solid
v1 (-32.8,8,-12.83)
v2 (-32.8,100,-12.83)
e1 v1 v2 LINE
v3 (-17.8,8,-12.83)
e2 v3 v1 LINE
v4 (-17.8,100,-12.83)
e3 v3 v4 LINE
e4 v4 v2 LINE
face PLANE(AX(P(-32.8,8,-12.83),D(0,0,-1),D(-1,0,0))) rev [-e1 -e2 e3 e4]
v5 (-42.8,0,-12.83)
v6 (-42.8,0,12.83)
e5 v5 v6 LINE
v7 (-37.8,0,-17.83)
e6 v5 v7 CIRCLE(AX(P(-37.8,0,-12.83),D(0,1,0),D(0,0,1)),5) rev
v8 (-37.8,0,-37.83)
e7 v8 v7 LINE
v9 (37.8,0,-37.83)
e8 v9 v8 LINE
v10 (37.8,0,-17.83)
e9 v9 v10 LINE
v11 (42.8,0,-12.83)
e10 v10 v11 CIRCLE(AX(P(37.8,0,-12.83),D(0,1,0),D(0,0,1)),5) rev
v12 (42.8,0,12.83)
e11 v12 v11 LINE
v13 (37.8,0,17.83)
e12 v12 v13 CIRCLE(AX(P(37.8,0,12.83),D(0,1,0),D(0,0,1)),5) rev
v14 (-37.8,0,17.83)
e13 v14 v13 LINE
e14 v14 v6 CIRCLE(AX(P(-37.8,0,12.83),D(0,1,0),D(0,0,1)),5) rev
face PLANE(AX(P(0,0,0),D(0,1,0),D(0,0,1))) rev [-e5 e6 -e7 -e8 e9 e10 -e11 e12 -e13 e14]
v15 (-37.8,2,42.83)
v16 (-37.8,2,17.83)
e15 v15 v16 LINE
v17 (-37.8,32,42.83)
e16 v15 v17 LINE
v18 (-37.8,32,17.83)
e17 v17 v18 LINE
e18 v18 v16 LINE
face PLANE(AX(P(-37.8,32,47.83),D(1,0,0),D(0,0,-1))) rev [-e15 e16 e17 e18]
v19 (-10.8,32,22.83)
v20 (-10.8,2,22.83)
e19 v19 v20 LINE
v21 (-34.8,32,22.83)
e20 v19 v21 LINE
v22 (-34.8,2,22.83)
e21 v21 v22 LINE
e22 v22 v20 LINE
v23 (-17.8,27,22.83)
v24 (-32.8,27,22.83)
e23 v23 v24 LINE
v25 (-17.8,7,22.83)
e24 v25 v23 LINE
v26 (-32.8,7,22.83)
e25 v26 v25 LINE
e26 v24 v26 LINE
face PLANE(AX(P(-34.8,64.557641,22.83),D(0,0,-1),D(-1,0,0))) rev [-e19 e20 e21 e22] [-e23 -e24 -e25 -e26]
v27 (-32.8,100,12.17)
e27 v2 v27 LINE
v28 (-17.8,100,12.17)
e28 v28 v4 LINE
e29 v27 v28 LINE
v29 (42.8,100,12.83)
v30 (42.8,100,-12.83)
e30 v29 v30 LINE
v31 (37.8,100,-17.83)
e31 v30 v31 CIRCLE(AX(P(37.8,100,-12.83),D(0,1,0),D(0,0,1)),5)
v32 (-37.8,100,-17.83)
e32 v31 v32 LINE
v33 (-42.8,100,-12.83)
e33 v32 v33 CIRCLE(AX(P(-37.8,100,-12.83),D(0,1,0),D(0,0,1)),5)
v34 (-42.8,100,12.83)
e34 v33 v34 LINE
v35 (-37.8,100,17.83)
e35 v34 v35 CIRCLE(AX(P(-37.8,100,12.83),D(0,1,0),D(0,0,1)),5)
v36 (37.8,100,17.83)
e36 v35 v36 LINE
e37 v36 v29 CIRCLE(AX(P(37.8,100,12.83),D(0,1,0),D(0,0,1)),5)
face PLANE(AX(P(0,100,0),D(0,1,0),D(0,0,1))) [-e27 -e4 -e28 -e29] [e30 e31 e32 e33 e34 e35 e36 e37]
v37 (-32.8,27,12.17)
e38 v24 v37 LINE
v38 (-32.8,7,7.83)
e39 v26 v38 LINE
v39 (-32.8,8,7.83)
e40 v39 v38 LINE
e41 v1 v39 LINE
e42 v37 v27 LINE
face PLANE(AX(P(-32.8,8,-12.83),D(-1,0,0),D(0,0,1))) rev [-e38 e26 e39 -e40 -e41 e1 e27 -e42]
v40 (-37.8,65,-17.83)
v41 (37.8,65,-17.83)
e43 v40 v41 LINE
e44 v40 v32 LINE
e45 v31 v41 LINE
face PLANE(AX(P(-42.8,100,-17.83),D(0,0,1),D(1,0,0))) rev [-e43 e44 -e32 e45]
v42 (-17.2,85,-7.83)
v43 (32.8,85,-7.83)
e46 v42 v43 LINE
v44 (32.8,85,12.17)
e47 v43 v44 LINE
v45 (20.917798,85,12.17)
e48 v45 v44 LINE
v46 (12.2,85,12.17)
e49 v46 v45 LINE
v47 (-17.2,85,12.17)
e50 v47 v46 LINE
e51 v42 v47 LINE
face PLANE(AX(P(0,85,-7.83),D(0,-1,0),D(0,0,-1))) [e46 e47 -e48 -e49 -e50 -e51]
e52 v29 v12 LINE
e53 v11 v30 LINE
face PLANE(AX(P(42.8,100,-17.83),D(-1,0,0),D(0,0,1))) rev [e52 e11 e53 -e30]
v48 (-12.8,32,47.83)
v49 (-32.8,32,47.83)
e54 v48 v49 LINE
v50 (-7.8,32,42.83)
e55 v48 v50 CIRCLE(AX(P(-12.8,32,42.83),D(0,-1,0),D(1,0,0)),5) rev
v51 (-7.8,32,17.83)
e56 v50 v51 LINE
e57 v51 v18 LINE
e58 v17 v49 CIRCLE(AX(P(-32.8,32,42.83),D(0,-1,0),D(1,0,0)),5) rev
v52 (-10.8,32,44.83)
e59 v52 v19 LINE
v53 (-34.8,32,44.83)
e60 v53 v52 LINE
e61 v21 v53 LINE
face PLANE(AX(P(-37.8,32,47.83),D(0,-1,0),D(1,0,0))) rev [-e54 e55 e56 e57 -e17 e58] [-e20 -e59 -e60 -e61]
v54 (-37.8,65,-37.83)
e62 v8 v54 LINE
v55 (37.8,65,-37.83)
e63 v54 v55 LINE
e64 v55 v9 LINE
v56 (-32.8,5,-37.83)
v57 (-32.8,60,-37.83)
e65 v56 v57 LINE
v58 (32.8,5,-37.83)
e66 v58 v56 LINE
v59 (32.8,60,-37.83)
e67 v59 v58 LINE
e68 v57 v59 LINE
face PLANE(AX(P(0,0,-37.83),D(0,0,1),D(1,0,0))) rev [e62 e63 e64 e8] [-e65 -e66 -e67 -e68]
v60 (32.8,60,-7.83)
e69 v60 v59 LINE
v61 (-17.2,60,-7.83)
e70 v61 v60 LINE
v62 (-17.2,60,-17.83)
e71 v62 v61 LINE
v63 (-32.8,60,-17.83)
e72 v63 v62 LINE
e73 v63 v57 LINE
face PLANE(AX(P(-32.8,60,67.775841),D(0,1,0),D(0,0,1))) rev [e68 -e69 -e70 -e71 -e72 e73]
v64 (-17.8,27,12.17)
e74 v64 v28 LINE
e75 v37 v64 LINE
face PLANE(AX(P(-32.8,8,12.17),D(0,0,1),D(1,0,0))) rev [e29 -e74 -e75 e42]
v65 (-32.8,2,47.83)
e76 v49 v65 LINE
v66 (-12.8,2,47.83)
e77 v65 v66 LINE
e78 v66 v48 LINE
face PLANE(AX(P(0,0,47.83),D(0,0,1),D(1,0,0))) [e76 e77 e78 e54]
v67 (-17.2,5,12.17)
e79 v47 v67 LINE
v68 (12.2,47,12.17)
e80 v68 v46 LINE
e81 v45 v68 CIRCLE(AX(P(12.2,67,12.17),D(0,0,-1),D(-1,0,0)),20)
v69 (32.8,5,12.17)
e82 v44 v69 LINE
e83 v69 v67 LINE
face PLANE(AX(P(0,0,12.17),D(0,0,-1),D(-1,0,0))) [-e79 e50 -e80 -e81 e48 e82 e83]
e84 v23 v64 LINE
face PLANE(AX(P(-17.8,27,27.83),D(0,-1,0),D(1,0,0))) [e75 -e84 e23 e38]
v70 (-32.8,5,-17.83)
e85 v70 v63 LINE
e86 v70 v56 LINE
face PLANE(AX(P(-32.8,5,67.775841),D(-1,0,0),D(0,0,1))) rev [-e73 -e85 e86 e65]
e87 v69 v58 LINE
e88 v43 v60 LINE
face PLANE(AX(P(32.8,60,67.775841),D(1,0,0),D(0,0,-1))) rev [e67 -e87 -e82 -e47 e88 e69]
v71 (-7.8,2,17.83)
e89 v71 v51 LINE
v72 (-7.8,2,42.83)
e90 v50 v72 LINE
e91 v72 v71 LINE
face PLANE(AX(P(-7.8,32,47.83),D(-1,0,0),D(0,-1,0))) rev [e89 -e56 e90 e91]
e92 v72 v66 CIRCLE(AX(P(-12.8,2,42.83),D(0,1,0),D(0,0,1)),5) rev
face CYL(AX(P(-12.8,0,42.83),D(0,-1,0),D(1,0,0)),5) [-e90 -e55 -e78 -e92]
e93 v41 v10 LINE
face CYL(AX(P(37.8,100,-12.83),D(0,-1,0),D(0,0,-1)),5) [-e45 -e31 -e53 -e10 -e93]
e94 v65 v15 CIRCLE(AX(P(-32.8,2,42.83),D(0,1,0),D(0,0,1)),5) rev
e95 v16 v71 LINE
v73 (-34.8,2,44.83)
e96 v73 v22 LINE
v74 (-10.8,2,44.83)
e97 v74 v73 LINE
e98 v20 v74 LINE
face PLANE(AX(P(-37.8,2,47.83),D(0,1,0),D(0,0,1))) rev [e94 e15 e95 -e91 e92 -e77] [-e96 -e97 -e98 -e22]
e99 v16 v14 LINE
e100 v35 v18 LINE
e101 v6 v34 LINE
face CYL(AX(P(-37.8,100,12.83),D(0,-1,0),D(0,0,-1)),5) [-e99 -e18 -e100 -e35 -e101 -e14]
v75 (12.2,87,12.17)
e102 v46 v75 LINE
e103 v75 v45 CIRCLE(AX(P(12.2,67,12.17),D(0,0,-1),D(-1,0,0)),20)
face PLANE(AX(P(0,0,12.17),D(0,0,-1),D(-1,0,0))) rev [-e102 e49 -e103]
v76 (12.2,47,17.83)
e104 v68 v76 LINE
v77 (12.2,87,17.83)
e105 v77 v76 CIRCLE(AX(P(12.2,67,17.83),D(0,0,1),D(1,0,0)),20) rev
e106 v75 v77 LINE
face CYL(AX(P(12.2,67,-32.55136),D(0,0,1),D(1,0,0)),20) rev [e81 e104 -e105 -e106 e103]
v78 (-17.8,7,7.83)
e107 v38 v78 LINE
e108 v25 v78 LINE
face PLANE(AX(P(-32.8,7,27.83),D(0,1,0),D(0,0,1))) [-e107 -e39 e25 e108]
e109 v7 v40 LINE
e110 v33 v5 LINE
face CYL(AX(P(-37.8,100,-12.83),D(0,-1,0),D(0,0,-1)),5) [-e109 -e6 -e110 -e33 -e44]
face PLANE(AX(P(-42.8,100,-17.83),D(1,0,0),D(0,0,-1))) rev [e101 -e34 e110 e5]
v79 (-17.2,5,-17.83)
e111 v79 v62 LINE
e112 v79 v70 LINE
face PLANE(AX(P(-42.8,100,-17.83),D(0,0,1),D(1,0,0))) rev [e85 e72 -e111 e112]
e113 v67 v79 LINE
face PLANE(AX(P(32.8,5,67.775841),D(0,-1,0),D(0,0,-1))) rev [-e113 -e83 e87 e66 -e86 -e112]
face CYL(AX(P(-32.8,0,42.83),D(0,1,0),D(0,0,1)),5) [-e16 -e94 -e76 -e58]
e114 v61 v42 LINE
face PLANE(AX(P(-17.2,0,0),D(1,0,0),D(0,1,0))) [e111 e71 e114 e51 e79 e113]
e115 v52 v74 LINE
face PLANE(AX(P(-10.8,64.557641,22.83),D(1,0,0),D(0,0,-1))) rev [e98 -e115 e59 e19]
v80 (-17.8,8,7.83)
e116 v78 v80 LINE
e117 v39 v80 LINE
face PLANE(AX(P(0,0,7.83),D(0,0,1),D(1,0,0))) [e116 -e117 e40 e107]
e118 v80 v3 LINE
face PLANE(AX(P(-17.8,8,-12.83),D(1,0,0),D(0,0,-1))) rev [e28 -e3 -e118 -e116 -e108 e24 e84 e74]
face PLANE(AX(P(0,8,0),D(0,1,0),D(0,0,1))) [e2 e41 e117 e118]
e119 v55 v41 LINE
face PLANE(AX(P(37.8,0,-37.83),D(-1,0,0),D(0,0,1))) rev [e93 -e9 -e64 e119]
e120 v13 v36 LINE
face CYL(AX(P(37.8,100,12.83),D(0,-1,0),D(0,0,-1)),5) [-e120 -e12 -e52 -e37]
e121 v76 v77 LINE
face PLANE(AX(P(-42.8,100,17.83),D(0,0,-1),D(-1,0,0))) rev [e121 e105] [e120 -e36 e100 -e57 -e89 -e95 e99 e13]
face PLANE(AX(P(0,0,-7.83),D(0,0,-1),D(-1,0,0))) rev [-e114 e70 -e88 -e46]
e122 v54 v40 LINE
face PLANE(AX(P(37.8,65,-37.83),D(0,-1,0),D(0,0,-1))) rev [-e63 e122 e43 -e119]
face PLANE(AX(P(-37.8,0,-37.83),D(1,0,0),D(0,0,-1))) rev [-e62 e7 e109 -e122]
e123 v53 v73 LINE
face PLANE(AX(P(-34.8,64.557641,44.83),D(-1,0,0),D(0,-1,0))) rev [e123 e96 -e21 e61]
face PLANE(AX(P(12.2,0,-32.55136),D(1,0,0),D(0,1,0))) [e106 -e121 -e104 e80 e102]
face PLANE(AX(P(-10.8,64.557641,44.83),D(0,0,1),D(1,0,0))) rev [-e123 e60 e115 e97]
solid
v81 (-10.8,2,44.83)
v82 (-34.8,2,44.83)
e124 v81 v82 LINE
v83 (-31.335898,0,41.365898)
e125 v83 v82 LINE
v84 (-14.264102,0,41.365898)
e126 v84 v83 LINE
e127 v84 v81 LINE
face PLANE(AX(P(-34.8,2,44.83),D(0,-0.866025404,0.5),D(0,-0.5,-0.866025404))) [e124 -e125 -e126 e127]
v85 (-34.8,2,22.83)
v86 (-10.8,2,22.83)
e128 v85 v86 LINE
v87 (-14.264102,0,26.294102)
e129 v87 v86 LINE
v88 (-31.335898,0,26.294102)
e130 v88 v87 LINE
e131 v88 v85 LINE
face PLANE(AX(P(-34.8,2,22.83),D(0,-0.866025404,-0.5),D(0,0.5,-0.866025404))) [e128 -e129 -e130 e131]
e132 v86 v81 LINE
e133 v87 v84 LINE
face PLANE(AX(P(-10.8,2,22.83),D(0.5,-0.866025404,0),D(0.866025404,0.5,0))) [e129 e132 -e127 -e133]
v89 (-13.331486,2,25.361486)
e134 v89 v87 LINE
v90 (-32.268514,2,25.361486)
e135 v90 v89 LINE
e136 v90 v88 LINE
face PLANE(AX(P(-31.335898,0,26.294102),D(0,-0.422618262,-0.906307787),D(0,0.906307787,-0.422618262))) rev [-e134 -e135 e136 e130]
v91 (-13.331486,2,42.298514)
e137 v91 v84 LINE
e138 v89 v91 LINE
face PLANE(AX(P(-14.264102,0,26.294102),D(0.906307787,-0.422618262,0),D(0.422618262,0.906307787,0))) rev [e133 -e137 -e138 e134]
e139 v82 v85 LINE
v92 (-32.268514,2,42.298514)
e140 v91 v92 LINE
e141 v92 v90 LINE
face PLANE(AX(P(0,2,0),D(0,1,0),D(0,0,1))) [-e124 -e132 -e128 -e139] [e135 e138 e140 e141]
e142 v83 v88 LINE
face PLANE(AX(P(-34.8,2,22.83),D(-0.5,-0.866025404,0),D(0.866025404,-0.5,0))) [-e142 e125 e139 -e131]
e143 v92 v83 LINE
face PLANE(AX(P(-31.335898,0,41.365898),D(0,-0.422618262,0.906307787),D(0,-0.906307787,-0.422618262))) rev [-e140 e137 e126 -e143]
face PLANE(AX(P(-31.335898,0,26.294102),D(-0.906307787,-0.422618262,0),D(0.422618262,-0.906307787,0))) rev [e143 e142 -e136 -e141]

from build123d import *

# Parameters (mm, degrees)
CROQUIS1_W                 = 85.6
CROQUIS1_H                 = 35.66
SALIENTE_EXTRUIR1_DEPTH    = 100
CROQUIS2_W                 = 15
CROQUIS2_H                 = 25
CORTAR_EXTRUIR1_DEPTH      = 92
CROQUIS3_W                 = 30
CROQUIS3_H                 = 30
SALIENTE_EXTRUIR2_DEPTH    = 30
CROQUIS4_W                 = 24
CROQUIS4_H                 = 22
CORTAR_EXTRUIR2_DEPTH      = 30
REDONDEO1_R                = 5
CROQUIS8_W                 = 75.6
CROQUIS8_H                 = 65
SALIENTE_EXTRUIR3_DEPTH    = 20
CORTAR_EXTRUIR3_DEPTH      = 10
CORTAR_EXTRUIR3_DEPTH_BACK = 10
CROQUIS6_W                 = 15
CROQUIS6_H                 = 20
CROQUIS9_W                 = 24
CROQUIS9_H                 = 22
SALIENTE_EXTRUIR4_DEPTH    = 2
SALIENTE_EXTRUIR4_TAPER    = 60
CROQUIS10_W                = 17.07179677
CROQUIS10_H                = 15.07179677
CORTAR_EXTRUIR4_DEPTH      = 2
CORTAR_EXTRUIR4_DRAFT      = 25
CROQUIS12_W                = 65.6
CROQUIS12_H                = 55
CORTAR_EXTRUIR6_DEPTH      = 20
CROQUIS17_W                = 30
CROQUIS17_H                = 55
CORTAR_EXTRUIR11_DEPTH     = 30
CORTAR_EXTRUIR18_DEPTH     = 20
CORTAR_EXTRUIR19_DEPTH     = 5.66
CORTAR_EXTRUIR20_DEPTH     = 20


with BuildPart() as part:
    # Croquis1 → Saliente-Extruir1 (new body)
    with BuildSketch(Plane(origin=(0, 0, 0), x_dir=(1, 0, 0), z_dir=(0, 1, 0))):
        Rectangle(CROQUIS1_W, CROQUIS1_H)
    extrude(amount=SALIENTE_EXTRUIR1_DEPTH)

    # Croquis2 → Cortar-Extruir1 (cut)
    with BuildSketch(Plane(origin=(0, 100, 0), x_dir=(1, 0, 0), z_dir=(0, 1, 0))):
        with Locations((-25.3, 0.33)):
            Rectangle(CROQUIS2_W, CROQUIS2_H)
    extrude(amount=-CORTAR_EXTRUIR1_DEPTH, mode=Mode.SUBTRACT)

    # Croquis3 → Saliente-Extruir2 (add)
    with BuildSketch(Plane.XY.offset(17.83)):
        with Locations((-22.8, 17)):
            Rectangle(CROQUIS3_W, CROQUIS3_H)
    extrude(amount=SALIENTE_EXTRUIR2_DEPTH)

    # Croquis4 → Cortar-Extruir2 (cut)
    with BuildSketch(Plane.XZ.offset(-2)):
        with Locations((-22.8, 33.83)):
            Rectangle(CROQUIS4_W, CROQUIS4_H)
    extrude(amount=-CORTAR_EXTRUIR2_DEPTH, mode=Mode.SUBTRACT)

    # Redondeo1
    redondeo1_edges = [part.edges().sort_by_distance(p)[0] for p in [
        (-7.8, 17, 47.83),
        (-37.8, 17, 47.83),
        (42.8, 50, 17.83),
        (-42.8, 50, 17.83),
        (-42.8, 50, -17.83),
        (42.8, 50, -17.83),
    ]]
    fillet(redondeo1_edges, radius=REDONDEO1_R - 0.0001)  # a hair under: the kernel refuses the full size

    # Croquis8 → Saliente-Extruir3 (add)
    with BuildSketch(Plane(origin=(0, 0, -17.83), x_dir=(-1, 0, 0), z_dir=(0, 0, -1))):
        with Locations((0, 32.5)):
            Rectangle(CROQUIS8_W, CROQUIS8_H)
    extrude(amount=SALIENTE_EXTRUIR3_DEPTH)

    # Croquis6 → Cortar-Extruir3 (cut, two sides: drawn at the far end of the back side and taken through both)
    with BuildSketch(Plane.XY.offset(17.83).offset(-CORTAR_EXTRUIR3_DEPTH_BACK)):
        with Locations((-25.3, 17)):
            Rectangle(CROQUIS6_W, CROQUIS6_H)
    extrude(amount=CORTAR_EXTRUIR3_DEPTH + CORTAR_EXTRUIR3_DEPTH_BACK, mode=Mode.SUBTRACT)

    # Croquis12 → Cortar-Extruir6 (cut)
    with BuildSketch(Plane(origin=(0, 0, -37.83), x_dir=(-1, 0, 0), z_dir=(0, 0, -1))):
        with Locations((0, 32.5)):
            Rectangle(CROQUIS12_W, CROQUIS12_H)
    extrude(amount=-CORTAR_EXTRUIR6_DEPTH, mode=Mode.SUBTRACT)

    # Croquis17 → Cortar-Extruir11 (cut)
    with BuildSketch(Plane(origin=(0, 0, -17.83), x_dir=(-1, 0, 0), z_dir=(0, 0, -1))):
        with Locations((-17.8, 32.5)):
            Rectangle(CROQUIS17_W, CROQUIS17_H)
    extrude(amount=-CORTAR_EXTRUIR11_DEPTH, mode=Mode.SUBTRACT)

    # Croquis19 → Cortar-Extruir18 (cut)
    with BuildSketch(Plane(origin=(0, 0, 12.17), x_dir=(-1, 0, 0), z_dir=(0, 0, -1))):
        with BuildLine():
            Line((-32.8, 60), (-22.164916731, 60))
            ThreePointArc((-22.164916731, 60), (-18.611388301, 77.247448714), (-2.8, 85))
            Line((-2.8, 85), (-32.8, 85))
            Line((-32.8, 85), (-32.8, 60))
        make_face()
        with BuildLine():
            ThreePointArc((-22.164916731, 60), (-15.047448714, 49.188611699), (-2.8, 45))
            Line((-2.8, 45), (-2.8, 60))
            Line((-2.8, 60), (-22.164916731, 60))
        make_face()
        with BuildLine():
            Line((-22.164916731, 60), (-2.8, 60))
            Line((-2.8, 60), (-2.8, 85))
            ThreePointArc((-2.8, 85), (-18.611388301, 77.247448714), (-22.164916731, 60))
        make_face()
    extrude(amount=CORTAR_EXTRUIR18_DEPTH, mode=Mode.SUBTRACT)

    # Croquis20 → Cortar-Extruir19 (cut)
    with BuildSketch(Plane.XY.offset(17.83)):
        with BuildLine():
            ThreePointArc((12.2, 87), (32.2, 67), (12.2, 47))
            Line((12.2, 47), (12.2, 87))
        make_face()
    extrude(amount=-CORTAR_EXTRUIR19_DEPTH, mode=Mode.SUBTRACT)

    # Croquis21 → Cortar-Extruir20 (cut)
    with BuildSketch(Plane(origin=(2.8, 0, 0), x_dir=(0, 0, -1), z_dir=(1, 0, 0))):
        Polygon((17.83, 5), (17.83, 60), (7.83, 60), (7.83, 85), (-12.17, 85), (-12.17, 5), align=None)
    extrude(amount=-CORTAR_EXTRUIR20_DEPTH, mode=Mode.SUBTRACT)


with BuildPart() as body_2:
    # Croquis9 → Saliente-Extruir4 (new body)
    with BuildSketch(Plane.XZ.offset(-2)):
        with Locations((-22.8, 33.83)):
            Rectangle(CROQUIS9_W, CROQUIS9_H)
    extrude(amount=SALIENTE_EXTRUIR4_DEPTH, taper=SALIENTE_EXTRUIR4_TAPER)


with BuildPart() as cortar_extruir4_tool:
    # Croquis10 → Cortar-Extruir4 (with draft: the straight prism first)
    with BuildSketch(Plane.XZ):
        with Locations((-22.8, 33.83)):
            Rectangle(CROQUIS10_W, CROQUIS10_H)
    extrude(amount=-CORTAR_EXTRUIR4_DEPTH)
    # Cortar-Extruir4: the draft: its side faces are tilted about the plane it starts from
    cortar_extruir4_sides = [cortar_extruir4_tool.faces().sort_by_distance(p)[0] for p in [
        (-22.8, 1, 26.294101615),
        (-14.264101615, 1, 33.83),
        (-22.8, 1, 41.365898385),
        (-31.335898385, 1, 33.83),
    ]]
    draft(cortar_extruir4_sides, Plane.XZ, CORTAR_EXTRUIR4_DRAFT)


with BuildPart() as body_2_1:
    add(body_2.part)

    # Cortar-Extruir4: cut by cortar_extruir4_tool
    add(cortar_extruir4_tool.part, mode=Mode.SUBTRACT)


solid = Compound([part.part, body_2_1.part])
